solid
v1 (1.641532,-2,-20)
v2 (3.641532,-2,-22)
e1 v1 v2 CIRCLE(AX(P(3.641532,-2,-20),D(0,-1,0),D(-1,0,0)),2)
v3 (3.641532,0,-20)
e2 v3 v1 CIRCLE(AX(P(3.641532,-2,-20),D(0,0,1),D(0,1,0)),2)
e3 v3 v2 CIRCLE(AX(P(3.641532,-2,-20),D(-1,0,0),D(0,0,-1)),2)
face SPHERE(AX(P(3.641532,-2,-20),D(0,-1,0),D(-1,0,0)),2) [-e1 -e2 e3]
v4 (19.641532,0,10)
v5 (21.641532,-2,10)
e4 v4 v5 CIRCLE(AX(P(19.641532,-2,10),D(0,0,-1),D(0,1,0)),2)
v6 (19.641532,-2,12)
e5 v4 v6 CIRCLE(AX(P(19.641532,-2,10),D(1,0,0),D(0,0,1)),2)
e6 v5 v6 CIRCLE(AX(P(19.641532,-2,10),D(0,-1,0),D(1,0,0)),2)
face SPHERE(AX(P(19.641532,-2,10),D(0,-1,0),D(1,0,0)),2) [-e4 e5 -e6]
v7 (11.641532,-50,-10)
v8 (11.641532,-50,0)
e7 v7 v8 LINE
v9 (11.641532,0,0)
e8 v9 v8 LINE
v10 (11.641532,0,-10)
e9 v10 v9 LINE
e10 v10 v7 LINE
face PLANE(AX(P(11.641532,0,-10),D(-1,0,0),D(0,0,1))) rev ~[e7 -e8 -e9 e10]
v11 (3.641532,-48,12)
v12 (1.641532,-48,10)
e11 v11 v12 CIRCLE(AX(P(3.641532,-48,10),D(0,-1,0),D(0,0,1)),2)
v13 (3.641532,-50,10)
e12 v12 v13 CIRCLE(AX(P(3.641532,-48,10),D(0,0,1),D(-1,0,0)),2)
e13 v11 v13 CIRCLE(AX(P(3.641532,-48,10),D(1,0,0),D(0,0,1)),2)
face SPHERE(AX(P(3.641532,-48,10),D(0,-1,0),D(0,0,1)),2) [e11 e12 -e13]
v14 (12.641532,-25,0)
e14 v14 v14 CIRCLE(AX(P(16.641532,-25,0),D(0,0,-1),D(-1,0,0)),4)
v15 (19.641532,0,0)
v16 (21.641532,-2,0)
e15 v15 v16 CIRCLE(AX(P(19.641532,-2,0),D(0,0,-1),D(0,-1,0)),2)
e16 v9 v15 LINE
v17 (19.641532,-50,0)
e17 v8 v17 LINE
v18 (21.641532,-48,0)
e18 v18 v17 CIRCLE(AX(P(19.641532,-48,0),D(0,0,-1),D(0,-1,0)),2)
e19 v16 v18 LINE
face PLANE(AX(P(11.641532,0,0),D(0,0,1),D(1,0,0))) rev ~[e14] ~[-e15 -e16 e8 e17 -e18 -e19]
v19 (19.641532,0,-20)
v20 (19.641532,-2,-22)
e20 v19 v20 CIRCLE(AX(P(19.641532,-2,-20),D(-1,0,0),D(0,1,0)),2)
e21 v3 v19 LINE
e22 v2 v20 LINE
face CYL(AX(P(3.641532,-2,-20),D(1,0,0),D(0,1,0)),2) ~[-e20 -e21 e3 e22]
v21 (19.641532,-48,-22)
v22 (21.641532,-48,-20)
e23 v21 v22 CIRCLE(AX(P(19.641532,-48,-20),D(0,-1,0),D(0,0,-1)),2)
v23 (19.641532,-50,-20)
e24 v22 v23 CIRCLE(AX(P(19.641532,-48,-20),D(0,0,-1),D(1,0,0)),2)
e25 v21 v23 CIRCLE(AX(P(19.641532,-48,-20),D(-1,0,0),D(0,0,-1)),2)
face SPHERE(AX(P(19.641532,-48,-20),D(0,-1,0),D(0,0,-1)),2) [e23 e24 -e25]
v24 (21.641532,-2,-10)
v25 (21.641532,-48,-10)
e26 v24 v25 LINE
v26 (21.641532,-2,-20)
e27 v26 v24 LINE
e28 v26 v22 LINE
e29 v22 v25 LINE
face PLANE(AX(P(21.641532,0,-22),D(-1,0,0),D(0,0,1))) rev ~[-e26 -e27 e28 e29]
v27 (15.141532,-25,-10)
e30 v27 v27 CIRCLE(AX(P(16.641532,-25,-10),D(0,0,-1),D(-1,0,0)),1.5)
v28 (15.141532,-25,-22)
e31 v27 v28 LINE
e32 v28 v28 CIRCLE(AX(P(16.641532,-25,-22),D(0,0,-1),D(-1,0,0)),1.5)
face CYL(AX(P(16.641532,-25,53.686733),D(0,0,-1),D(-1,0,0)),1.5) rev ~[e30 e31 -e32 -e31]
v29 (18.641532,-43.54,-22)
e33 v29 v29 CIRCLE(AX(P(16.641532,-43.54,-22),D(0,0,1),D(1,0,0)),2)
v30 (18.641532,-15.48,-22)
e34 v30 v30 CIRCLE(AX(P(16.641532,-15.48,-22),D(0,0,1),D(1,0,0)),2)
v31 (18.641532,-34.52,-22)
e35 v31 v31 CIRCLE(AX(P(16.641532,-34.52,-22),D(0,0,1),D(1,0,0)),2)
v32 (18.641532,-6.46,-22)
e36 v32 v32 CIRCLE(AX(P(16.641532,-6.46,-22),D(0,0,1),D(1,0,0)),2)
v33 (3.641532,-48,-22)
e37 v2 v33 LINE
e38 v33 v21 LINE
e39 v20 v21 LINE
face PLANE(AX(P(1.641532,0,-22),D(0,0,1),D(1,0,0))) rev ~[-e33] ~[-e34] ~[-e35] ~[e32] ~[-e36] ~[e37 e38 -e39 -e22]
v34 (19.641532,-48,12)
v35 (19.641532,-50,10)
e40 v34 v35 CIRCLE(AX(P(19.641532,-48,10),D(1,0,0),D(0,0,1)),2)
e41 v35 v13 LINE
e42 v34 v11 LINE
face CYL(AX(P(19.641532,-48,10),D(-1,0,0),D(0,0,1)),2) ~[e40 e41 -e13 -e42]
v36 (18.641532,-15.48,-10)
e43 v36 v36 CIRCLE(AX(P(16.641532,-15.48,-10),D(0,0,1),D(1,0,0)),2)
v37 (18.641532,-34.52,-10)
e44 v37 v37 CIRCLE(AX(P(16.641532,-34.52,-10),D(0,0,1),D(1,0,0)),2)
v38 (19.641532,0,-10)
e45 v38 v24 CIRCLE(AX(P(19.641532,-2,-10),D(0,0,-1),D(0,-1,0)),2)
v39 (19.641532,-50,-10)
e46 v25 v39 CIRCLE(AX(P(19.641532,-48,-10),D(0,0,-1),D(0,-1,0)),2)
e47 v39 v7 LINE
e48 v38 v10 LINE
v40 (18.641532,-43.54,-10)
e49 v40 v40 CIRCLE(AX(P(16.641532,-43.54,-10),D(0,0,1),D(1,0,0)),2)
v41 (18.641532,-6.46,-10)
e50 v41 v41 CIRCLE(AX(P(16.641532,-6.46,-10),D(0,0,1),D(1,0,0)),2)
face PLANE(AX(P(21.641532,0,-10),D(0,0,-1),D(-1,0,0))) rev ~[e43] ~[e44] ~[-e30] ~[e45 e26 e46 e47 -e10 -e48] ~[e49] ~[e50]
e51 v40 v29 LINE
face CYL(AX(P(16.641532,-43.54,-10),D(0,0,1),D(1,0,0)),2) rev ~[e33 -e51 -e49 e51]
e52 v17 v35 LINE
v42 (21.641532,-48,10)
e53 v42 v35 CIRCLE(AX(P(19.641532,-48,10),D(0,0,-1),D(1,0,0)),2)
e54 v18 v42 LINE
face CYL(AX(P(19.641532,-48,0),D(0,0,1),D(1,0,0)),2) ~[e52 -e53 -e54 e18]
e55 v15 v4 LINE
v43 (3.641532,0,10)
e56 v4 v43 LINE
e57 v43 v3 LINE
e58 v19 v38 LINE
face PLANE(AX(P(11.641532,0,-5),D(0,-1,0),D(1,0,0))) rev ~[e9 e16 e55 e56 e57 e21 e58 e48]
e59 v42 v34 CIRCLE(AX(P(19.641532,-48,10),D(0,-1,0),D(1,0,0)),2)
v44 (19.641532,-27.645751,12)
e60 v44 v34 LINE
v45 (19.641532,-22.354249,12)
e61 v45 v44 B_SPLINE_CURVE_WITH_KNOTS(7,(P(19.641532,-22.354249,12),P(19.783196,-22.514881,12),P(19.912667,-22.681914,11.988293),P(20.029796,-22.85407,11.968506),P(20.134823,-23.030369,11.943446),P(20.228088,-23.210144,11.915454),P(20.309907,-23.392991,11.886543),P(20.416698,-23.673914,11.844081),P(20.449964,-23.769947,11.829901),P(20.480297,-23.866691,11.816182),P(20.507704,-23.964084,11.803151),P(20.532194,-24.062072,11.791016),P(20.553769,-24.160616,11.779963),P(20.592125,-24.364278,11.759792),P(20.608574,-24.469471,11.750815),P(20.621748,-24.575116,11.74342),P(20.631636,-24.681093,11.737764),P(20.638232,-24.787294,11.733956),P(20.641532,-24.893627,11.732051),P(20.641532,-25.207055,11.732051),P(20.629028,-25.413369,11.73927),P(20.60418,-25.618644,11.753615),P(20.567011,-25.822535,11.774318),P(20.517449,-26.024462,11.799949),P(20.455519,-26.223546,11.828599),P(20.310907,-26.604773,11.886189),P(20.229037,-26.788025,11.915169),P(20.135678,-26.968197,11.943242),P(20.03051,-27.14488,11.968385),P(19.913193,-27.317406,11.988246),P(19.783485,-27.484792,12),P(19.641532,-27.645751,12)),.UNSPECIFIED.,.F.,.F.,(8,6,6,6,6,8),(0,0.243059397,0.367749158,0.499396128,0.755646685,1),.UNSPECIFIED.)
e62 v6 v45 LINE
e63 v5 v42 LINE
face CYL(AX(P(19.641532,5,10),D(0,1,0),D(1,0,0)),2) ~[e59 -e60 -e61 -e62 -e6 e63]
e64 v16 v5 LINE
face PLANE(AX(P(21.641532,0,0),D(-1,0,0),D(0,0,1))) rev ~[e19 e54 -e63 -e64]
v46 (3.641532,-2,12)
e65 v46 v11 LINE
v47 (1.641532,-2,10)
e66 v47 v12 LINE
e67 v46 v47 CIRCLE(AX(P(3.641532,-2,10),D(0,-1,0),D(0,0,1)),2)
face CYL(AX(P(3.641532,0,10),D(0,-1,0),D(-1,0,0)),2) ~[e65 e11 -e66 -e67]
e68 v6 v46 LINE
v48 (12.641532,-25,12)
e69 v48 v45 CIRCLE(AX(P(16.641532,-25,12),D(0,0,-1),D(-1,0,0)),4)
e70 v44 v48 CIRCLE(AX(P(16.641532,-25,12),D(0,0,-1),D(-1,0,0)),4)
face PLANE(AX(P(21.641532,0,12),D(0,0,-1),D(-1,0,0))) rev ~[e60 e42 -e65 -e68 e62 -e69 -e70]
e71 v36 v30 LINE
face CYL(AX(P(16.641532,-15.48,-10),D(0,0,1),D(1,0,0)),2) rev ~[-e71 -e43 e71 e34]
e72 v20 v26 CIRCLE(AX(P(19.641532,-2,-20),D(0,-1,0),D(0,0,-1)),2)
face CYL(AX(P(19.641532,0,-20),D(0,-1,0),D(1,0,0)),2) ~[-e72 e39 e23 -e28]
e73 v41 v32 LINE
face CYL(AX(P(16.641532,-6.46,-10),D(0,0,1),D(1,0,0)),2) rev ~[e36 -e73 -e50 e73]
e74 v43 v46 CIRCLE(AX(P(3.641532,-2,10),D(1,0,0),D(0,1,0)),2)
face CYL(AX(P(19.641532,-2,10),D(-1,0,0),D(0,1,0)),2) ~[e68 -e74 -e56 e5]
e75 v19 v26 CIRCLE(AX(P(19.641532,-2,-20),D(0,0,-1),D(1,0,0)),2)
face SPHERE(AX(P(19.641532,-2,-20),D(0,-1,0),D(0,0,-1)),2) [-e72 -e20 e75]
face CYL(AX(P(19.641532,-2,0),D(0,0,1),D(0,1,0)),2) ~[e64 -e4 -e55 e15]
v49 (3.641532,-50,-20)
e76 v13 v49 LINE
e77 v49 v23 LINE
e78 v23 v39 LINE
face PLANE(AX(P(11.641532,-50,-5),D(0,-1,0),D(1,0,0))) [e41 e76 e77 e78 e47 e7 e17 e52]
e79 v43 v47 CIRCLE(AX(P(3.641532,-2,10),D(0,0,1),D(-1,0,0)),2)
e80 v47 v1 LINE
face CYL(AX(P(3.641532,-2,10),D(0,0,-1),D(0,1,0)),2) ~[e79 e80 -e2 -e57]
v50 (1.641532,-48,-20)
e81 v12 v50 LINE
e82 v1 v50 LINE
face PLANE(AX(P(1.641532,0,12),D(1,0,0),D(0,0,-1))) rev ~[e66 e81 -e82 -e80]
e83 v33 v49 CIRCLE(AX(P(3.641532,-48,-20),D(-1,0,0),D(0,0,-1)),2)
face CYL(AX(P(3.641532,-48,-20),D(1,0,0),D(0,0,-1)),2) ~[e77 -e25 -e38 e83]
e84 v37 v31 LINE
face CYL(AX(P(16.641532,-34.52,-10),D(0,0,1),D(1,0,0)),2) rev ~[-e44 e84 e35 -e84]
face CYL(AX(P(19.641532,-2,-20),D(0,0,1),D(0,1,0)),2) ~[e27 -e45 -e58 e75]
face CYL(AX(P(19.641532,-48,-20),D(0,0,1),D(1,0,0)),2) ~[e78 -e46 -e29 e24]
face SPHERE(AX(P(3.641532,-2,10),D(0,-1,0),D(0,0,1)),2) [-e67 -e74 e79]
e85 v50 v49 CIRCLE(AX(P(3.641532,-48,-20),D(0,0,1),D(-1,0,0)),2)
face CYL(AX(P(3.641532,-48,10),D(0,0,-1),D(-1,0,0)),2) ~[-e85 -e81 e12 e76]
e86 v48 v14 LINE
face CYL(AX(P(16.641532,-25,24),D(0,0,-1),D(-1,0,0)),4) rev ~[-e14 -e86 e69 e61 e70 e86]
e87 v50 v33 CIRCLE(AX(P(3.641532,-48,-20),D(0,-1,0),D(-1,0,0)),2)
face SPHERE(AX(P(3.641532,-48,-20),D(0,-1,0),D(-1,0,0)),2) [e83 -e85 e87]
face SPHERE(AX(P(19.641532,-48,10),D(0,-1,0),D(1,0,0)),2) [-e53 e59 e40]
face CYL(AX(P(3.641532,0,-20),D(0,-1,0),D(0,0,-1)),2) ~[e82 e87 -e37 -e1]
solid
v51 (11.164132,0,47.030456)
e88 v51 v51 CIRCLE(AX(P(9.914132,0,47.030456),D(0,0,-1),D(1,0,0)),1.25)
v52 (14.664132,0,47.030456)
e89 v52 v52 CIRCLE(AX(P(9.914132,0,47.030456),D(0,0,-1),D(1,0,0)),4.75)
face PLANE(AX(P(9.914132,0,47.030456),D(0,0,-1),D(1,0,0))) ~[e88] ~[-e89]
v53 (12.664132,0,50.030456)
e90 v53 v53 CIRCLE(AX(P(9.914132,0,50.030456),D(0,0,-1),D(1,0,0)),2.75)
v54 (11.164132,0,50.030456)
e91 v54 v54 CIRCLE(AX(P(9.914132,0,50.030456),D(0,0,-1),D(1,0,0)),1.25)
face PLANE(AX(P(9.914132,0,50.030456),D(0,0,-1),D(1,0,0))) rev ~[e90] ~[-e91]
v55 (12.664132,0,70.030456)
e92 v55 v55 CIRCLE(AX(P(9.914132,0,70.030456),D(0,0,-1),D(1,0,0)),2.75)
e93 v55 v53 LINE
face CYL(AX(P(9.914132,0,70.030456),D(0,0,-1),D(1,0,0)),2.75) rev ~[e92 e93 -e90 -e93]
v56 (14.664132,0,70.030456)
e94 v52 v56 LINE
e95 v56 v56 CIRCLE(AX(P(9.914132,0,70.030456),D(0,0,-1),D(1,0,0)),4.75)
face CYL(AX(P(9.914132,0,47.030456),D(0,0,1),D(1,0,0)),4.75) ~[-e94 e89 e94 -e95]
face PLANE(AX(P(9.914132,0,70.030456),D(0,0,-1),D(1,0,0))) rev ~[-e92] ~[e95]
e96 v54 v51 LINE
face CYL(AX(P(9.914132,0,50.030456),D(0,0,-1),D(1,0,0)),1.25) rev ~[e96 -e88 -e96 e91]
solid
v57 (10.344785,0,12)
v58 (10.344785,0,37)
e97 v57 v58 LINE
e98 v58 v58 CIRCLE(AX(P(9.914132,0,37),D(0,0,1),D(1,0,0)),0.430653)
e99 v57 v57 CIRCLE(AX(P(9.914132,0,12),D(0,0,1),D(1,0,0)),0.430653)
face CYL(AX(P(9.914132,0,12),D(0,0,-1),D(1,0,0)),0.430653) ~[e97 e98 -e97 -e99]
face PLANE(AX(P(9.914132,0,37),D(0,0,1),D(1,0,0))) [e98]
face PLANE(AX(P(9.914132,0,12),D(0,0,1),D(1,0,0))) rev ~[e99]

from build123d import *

# Parameters (mm, degrees)
F1_DEPTH     = 50
F3_D         = 8
F3_DEPTH     = 12
F3_TIP       = 2.4034424761
F5_D         = 3
F7_D         = 4
F7_DEPTH     = 12.001
F9_D         = 4
F9_DEPTH     = 12.001
F11_D        = 4
F11_DEPTH    = 12.001
F13_D        = 4
F13_DEPTH    = 12.001
F14_T1_DEPTH = 60
F15_R        = 2
F16_R        = 2
F17_R        = 2
F20_R        = 0.430653221
F21_DEPTH    = 25


# Not quite as in the source:
# - a fillet or chamfer that OpenCascade refuses, or shapes differently, is made with other operations: its cross-section is extruded or revolved along the edge and cut away or added


with BuildPart() as f1:
    # F0 (on Front) → F1 (new body)
    with BuildSketch(Plane.XZ):
        Polygon((21.6415318622, 12), (1.6415318622, 12), (1.6415318622, -22), (21.6415318622, -22), (21.6415318622, -10), (11.6415318622, -10), (11.6415318622, 0), (21.6415318622, 0), align=None)
    extrude(amount=F1_DEPTH)

    # F3
    with Locations(Plane.XY.offset(12)):
        with Locations((16.6415318622, -25)):
            Hole(F3_D / 2, depth=F3_DEPTH)
            with Locations((0, 0, -(F3_DEPTH + F3_TIP / 2))):  # 118° drill point
                Cone(0, F3_D / 2, F3_TIP, mode=Mode.SUBTRACT)

    # F5 (through all)
    with Locations(Plane.XY.offset(-10)):
        with Locations((16.6415318622, -25)):
            Hole(F5_D / 2)

    # F7 (through all, one way)
    with BuildSketch(Plane.XY.offset(-10)):
        with Locations((16.6415318622, -34.52)):
            Circle(F7_D / 2)
    extrude(amount=-F7_DEPTH, mode=Mode.SUBTRACT)

    # F9 (through all, one way)
    with BuildSketch(Plane.XY.offset(-10)):
        with Locations((16.6415318622, -15.48)):
            Circle(F9_D / 2)
    extrude(amount=-F9_DEPTH, mode=Mode.SUBTRACT)

    # F11 (through all, one way)
    with BuildSketch(Plane.XY.offset(-10)):
        with Locations((16.6415318622, -6.46)):
            Circle(F11_D / 2)
    extrude(amount=-F11_DEPTH, mode=Mode.SUBTRACT)

    # F13 (through all, one way)
    with BuildSketch(Plane.XY.offset(-10)):
        with Locations((16.6415318622, -43.54)):
            Circle(F13_D / 2)
    extrude(amount=-F13_DEPTH, mode=Mode.SUBTRACT)

    # F14: fillet of radius 2 on 1 edges, made by hand

    # F14_s2 → F14_t1 (cut)
    with BuildSketch(Plane.XZ.offset(-5)):
        with BuildLine():
            ThreePointArc((21.6415318622, 10), (21.0557454246, 11.4142135624), (19.6415318622, 12))
            Line((19.6415318622, 12), (21.6415318622, 12))
            Line((21.6415318622, 12), (21.6415318622, 10))
        make_face()
    extrude(amount=F14_T1_DEPTH, mode=Mode.SUBTRACT)

    # F15
    f15_edges = [f1.edges().sort_by_distance(p)[0] for p in [
        (21.641532, -25, -22),
    ]]
    fillet(f15_edges, radius=F15_R)

    # F16
    f16_edges = [f1.edges().sort_by_distance(p)[0] for p in [
        (1.641532, -25, 12),
        (1.641532, -25, -22),
    ]]
    fillet(f16_edges, radius=F16_R)

    # F17
    f17_edges = [f1.edges().sort_by_distance(p)[0] for p in [
        (11.641532, -50, -22),
        (1.641532, -50, -5),
        (11.641532, -50, 12),
        (11.641532, 0, 12),
        (1.641532, 0, -5),
        (11.641532, 0, -22),
        (2.227318, 0, -21.414214),
        (21.055745, 0, -21.414214),
        (21.641532, 0, -15),
        (2.227318, 0, 11.414214),
        (21.055745, 0, 11.414214),
        (21.641532, 0, 5),
        (2.227318, -50, -21.414214),
        (21.055745, -50, -21.414214),
        (21.641532, -50, -15),
        (2.227318, -50, 11.414214),
        (21.055745, -50, 11.414214),
        (21.641532, -50, 5),
    ]]
    fillet(f17_edges, radius=F17_R)


with BuildPart() as f21:
    # F20 (on face) → F21 (new body)
    with BuildSketch(Plane.XY.offset(12)):
        with Locations((9.9141315413, 0)):
            Circle(F20_R)
    extrude(amount=F21_DEPTH)


with BuildPart() as f22:
    # F18 (on Front) → F22 (revolve)
    with BuildSketch(Plane.XZ):
        Polygon((11.1641315413, 47.0304564509), (14.6641315413, 47.0304564509), (14.6641315413, 70.0304564509), (12.6641315413, 70.0304564509), (12.6641315413, 50.0304564509), (11.1641315413, 50.0304564509), align=None)
    revolve(axis=Axis((9.9141315413, 0, 12), (0, 0, -1)))


solid = Compound([f1.part, f21.part, f22.part])
